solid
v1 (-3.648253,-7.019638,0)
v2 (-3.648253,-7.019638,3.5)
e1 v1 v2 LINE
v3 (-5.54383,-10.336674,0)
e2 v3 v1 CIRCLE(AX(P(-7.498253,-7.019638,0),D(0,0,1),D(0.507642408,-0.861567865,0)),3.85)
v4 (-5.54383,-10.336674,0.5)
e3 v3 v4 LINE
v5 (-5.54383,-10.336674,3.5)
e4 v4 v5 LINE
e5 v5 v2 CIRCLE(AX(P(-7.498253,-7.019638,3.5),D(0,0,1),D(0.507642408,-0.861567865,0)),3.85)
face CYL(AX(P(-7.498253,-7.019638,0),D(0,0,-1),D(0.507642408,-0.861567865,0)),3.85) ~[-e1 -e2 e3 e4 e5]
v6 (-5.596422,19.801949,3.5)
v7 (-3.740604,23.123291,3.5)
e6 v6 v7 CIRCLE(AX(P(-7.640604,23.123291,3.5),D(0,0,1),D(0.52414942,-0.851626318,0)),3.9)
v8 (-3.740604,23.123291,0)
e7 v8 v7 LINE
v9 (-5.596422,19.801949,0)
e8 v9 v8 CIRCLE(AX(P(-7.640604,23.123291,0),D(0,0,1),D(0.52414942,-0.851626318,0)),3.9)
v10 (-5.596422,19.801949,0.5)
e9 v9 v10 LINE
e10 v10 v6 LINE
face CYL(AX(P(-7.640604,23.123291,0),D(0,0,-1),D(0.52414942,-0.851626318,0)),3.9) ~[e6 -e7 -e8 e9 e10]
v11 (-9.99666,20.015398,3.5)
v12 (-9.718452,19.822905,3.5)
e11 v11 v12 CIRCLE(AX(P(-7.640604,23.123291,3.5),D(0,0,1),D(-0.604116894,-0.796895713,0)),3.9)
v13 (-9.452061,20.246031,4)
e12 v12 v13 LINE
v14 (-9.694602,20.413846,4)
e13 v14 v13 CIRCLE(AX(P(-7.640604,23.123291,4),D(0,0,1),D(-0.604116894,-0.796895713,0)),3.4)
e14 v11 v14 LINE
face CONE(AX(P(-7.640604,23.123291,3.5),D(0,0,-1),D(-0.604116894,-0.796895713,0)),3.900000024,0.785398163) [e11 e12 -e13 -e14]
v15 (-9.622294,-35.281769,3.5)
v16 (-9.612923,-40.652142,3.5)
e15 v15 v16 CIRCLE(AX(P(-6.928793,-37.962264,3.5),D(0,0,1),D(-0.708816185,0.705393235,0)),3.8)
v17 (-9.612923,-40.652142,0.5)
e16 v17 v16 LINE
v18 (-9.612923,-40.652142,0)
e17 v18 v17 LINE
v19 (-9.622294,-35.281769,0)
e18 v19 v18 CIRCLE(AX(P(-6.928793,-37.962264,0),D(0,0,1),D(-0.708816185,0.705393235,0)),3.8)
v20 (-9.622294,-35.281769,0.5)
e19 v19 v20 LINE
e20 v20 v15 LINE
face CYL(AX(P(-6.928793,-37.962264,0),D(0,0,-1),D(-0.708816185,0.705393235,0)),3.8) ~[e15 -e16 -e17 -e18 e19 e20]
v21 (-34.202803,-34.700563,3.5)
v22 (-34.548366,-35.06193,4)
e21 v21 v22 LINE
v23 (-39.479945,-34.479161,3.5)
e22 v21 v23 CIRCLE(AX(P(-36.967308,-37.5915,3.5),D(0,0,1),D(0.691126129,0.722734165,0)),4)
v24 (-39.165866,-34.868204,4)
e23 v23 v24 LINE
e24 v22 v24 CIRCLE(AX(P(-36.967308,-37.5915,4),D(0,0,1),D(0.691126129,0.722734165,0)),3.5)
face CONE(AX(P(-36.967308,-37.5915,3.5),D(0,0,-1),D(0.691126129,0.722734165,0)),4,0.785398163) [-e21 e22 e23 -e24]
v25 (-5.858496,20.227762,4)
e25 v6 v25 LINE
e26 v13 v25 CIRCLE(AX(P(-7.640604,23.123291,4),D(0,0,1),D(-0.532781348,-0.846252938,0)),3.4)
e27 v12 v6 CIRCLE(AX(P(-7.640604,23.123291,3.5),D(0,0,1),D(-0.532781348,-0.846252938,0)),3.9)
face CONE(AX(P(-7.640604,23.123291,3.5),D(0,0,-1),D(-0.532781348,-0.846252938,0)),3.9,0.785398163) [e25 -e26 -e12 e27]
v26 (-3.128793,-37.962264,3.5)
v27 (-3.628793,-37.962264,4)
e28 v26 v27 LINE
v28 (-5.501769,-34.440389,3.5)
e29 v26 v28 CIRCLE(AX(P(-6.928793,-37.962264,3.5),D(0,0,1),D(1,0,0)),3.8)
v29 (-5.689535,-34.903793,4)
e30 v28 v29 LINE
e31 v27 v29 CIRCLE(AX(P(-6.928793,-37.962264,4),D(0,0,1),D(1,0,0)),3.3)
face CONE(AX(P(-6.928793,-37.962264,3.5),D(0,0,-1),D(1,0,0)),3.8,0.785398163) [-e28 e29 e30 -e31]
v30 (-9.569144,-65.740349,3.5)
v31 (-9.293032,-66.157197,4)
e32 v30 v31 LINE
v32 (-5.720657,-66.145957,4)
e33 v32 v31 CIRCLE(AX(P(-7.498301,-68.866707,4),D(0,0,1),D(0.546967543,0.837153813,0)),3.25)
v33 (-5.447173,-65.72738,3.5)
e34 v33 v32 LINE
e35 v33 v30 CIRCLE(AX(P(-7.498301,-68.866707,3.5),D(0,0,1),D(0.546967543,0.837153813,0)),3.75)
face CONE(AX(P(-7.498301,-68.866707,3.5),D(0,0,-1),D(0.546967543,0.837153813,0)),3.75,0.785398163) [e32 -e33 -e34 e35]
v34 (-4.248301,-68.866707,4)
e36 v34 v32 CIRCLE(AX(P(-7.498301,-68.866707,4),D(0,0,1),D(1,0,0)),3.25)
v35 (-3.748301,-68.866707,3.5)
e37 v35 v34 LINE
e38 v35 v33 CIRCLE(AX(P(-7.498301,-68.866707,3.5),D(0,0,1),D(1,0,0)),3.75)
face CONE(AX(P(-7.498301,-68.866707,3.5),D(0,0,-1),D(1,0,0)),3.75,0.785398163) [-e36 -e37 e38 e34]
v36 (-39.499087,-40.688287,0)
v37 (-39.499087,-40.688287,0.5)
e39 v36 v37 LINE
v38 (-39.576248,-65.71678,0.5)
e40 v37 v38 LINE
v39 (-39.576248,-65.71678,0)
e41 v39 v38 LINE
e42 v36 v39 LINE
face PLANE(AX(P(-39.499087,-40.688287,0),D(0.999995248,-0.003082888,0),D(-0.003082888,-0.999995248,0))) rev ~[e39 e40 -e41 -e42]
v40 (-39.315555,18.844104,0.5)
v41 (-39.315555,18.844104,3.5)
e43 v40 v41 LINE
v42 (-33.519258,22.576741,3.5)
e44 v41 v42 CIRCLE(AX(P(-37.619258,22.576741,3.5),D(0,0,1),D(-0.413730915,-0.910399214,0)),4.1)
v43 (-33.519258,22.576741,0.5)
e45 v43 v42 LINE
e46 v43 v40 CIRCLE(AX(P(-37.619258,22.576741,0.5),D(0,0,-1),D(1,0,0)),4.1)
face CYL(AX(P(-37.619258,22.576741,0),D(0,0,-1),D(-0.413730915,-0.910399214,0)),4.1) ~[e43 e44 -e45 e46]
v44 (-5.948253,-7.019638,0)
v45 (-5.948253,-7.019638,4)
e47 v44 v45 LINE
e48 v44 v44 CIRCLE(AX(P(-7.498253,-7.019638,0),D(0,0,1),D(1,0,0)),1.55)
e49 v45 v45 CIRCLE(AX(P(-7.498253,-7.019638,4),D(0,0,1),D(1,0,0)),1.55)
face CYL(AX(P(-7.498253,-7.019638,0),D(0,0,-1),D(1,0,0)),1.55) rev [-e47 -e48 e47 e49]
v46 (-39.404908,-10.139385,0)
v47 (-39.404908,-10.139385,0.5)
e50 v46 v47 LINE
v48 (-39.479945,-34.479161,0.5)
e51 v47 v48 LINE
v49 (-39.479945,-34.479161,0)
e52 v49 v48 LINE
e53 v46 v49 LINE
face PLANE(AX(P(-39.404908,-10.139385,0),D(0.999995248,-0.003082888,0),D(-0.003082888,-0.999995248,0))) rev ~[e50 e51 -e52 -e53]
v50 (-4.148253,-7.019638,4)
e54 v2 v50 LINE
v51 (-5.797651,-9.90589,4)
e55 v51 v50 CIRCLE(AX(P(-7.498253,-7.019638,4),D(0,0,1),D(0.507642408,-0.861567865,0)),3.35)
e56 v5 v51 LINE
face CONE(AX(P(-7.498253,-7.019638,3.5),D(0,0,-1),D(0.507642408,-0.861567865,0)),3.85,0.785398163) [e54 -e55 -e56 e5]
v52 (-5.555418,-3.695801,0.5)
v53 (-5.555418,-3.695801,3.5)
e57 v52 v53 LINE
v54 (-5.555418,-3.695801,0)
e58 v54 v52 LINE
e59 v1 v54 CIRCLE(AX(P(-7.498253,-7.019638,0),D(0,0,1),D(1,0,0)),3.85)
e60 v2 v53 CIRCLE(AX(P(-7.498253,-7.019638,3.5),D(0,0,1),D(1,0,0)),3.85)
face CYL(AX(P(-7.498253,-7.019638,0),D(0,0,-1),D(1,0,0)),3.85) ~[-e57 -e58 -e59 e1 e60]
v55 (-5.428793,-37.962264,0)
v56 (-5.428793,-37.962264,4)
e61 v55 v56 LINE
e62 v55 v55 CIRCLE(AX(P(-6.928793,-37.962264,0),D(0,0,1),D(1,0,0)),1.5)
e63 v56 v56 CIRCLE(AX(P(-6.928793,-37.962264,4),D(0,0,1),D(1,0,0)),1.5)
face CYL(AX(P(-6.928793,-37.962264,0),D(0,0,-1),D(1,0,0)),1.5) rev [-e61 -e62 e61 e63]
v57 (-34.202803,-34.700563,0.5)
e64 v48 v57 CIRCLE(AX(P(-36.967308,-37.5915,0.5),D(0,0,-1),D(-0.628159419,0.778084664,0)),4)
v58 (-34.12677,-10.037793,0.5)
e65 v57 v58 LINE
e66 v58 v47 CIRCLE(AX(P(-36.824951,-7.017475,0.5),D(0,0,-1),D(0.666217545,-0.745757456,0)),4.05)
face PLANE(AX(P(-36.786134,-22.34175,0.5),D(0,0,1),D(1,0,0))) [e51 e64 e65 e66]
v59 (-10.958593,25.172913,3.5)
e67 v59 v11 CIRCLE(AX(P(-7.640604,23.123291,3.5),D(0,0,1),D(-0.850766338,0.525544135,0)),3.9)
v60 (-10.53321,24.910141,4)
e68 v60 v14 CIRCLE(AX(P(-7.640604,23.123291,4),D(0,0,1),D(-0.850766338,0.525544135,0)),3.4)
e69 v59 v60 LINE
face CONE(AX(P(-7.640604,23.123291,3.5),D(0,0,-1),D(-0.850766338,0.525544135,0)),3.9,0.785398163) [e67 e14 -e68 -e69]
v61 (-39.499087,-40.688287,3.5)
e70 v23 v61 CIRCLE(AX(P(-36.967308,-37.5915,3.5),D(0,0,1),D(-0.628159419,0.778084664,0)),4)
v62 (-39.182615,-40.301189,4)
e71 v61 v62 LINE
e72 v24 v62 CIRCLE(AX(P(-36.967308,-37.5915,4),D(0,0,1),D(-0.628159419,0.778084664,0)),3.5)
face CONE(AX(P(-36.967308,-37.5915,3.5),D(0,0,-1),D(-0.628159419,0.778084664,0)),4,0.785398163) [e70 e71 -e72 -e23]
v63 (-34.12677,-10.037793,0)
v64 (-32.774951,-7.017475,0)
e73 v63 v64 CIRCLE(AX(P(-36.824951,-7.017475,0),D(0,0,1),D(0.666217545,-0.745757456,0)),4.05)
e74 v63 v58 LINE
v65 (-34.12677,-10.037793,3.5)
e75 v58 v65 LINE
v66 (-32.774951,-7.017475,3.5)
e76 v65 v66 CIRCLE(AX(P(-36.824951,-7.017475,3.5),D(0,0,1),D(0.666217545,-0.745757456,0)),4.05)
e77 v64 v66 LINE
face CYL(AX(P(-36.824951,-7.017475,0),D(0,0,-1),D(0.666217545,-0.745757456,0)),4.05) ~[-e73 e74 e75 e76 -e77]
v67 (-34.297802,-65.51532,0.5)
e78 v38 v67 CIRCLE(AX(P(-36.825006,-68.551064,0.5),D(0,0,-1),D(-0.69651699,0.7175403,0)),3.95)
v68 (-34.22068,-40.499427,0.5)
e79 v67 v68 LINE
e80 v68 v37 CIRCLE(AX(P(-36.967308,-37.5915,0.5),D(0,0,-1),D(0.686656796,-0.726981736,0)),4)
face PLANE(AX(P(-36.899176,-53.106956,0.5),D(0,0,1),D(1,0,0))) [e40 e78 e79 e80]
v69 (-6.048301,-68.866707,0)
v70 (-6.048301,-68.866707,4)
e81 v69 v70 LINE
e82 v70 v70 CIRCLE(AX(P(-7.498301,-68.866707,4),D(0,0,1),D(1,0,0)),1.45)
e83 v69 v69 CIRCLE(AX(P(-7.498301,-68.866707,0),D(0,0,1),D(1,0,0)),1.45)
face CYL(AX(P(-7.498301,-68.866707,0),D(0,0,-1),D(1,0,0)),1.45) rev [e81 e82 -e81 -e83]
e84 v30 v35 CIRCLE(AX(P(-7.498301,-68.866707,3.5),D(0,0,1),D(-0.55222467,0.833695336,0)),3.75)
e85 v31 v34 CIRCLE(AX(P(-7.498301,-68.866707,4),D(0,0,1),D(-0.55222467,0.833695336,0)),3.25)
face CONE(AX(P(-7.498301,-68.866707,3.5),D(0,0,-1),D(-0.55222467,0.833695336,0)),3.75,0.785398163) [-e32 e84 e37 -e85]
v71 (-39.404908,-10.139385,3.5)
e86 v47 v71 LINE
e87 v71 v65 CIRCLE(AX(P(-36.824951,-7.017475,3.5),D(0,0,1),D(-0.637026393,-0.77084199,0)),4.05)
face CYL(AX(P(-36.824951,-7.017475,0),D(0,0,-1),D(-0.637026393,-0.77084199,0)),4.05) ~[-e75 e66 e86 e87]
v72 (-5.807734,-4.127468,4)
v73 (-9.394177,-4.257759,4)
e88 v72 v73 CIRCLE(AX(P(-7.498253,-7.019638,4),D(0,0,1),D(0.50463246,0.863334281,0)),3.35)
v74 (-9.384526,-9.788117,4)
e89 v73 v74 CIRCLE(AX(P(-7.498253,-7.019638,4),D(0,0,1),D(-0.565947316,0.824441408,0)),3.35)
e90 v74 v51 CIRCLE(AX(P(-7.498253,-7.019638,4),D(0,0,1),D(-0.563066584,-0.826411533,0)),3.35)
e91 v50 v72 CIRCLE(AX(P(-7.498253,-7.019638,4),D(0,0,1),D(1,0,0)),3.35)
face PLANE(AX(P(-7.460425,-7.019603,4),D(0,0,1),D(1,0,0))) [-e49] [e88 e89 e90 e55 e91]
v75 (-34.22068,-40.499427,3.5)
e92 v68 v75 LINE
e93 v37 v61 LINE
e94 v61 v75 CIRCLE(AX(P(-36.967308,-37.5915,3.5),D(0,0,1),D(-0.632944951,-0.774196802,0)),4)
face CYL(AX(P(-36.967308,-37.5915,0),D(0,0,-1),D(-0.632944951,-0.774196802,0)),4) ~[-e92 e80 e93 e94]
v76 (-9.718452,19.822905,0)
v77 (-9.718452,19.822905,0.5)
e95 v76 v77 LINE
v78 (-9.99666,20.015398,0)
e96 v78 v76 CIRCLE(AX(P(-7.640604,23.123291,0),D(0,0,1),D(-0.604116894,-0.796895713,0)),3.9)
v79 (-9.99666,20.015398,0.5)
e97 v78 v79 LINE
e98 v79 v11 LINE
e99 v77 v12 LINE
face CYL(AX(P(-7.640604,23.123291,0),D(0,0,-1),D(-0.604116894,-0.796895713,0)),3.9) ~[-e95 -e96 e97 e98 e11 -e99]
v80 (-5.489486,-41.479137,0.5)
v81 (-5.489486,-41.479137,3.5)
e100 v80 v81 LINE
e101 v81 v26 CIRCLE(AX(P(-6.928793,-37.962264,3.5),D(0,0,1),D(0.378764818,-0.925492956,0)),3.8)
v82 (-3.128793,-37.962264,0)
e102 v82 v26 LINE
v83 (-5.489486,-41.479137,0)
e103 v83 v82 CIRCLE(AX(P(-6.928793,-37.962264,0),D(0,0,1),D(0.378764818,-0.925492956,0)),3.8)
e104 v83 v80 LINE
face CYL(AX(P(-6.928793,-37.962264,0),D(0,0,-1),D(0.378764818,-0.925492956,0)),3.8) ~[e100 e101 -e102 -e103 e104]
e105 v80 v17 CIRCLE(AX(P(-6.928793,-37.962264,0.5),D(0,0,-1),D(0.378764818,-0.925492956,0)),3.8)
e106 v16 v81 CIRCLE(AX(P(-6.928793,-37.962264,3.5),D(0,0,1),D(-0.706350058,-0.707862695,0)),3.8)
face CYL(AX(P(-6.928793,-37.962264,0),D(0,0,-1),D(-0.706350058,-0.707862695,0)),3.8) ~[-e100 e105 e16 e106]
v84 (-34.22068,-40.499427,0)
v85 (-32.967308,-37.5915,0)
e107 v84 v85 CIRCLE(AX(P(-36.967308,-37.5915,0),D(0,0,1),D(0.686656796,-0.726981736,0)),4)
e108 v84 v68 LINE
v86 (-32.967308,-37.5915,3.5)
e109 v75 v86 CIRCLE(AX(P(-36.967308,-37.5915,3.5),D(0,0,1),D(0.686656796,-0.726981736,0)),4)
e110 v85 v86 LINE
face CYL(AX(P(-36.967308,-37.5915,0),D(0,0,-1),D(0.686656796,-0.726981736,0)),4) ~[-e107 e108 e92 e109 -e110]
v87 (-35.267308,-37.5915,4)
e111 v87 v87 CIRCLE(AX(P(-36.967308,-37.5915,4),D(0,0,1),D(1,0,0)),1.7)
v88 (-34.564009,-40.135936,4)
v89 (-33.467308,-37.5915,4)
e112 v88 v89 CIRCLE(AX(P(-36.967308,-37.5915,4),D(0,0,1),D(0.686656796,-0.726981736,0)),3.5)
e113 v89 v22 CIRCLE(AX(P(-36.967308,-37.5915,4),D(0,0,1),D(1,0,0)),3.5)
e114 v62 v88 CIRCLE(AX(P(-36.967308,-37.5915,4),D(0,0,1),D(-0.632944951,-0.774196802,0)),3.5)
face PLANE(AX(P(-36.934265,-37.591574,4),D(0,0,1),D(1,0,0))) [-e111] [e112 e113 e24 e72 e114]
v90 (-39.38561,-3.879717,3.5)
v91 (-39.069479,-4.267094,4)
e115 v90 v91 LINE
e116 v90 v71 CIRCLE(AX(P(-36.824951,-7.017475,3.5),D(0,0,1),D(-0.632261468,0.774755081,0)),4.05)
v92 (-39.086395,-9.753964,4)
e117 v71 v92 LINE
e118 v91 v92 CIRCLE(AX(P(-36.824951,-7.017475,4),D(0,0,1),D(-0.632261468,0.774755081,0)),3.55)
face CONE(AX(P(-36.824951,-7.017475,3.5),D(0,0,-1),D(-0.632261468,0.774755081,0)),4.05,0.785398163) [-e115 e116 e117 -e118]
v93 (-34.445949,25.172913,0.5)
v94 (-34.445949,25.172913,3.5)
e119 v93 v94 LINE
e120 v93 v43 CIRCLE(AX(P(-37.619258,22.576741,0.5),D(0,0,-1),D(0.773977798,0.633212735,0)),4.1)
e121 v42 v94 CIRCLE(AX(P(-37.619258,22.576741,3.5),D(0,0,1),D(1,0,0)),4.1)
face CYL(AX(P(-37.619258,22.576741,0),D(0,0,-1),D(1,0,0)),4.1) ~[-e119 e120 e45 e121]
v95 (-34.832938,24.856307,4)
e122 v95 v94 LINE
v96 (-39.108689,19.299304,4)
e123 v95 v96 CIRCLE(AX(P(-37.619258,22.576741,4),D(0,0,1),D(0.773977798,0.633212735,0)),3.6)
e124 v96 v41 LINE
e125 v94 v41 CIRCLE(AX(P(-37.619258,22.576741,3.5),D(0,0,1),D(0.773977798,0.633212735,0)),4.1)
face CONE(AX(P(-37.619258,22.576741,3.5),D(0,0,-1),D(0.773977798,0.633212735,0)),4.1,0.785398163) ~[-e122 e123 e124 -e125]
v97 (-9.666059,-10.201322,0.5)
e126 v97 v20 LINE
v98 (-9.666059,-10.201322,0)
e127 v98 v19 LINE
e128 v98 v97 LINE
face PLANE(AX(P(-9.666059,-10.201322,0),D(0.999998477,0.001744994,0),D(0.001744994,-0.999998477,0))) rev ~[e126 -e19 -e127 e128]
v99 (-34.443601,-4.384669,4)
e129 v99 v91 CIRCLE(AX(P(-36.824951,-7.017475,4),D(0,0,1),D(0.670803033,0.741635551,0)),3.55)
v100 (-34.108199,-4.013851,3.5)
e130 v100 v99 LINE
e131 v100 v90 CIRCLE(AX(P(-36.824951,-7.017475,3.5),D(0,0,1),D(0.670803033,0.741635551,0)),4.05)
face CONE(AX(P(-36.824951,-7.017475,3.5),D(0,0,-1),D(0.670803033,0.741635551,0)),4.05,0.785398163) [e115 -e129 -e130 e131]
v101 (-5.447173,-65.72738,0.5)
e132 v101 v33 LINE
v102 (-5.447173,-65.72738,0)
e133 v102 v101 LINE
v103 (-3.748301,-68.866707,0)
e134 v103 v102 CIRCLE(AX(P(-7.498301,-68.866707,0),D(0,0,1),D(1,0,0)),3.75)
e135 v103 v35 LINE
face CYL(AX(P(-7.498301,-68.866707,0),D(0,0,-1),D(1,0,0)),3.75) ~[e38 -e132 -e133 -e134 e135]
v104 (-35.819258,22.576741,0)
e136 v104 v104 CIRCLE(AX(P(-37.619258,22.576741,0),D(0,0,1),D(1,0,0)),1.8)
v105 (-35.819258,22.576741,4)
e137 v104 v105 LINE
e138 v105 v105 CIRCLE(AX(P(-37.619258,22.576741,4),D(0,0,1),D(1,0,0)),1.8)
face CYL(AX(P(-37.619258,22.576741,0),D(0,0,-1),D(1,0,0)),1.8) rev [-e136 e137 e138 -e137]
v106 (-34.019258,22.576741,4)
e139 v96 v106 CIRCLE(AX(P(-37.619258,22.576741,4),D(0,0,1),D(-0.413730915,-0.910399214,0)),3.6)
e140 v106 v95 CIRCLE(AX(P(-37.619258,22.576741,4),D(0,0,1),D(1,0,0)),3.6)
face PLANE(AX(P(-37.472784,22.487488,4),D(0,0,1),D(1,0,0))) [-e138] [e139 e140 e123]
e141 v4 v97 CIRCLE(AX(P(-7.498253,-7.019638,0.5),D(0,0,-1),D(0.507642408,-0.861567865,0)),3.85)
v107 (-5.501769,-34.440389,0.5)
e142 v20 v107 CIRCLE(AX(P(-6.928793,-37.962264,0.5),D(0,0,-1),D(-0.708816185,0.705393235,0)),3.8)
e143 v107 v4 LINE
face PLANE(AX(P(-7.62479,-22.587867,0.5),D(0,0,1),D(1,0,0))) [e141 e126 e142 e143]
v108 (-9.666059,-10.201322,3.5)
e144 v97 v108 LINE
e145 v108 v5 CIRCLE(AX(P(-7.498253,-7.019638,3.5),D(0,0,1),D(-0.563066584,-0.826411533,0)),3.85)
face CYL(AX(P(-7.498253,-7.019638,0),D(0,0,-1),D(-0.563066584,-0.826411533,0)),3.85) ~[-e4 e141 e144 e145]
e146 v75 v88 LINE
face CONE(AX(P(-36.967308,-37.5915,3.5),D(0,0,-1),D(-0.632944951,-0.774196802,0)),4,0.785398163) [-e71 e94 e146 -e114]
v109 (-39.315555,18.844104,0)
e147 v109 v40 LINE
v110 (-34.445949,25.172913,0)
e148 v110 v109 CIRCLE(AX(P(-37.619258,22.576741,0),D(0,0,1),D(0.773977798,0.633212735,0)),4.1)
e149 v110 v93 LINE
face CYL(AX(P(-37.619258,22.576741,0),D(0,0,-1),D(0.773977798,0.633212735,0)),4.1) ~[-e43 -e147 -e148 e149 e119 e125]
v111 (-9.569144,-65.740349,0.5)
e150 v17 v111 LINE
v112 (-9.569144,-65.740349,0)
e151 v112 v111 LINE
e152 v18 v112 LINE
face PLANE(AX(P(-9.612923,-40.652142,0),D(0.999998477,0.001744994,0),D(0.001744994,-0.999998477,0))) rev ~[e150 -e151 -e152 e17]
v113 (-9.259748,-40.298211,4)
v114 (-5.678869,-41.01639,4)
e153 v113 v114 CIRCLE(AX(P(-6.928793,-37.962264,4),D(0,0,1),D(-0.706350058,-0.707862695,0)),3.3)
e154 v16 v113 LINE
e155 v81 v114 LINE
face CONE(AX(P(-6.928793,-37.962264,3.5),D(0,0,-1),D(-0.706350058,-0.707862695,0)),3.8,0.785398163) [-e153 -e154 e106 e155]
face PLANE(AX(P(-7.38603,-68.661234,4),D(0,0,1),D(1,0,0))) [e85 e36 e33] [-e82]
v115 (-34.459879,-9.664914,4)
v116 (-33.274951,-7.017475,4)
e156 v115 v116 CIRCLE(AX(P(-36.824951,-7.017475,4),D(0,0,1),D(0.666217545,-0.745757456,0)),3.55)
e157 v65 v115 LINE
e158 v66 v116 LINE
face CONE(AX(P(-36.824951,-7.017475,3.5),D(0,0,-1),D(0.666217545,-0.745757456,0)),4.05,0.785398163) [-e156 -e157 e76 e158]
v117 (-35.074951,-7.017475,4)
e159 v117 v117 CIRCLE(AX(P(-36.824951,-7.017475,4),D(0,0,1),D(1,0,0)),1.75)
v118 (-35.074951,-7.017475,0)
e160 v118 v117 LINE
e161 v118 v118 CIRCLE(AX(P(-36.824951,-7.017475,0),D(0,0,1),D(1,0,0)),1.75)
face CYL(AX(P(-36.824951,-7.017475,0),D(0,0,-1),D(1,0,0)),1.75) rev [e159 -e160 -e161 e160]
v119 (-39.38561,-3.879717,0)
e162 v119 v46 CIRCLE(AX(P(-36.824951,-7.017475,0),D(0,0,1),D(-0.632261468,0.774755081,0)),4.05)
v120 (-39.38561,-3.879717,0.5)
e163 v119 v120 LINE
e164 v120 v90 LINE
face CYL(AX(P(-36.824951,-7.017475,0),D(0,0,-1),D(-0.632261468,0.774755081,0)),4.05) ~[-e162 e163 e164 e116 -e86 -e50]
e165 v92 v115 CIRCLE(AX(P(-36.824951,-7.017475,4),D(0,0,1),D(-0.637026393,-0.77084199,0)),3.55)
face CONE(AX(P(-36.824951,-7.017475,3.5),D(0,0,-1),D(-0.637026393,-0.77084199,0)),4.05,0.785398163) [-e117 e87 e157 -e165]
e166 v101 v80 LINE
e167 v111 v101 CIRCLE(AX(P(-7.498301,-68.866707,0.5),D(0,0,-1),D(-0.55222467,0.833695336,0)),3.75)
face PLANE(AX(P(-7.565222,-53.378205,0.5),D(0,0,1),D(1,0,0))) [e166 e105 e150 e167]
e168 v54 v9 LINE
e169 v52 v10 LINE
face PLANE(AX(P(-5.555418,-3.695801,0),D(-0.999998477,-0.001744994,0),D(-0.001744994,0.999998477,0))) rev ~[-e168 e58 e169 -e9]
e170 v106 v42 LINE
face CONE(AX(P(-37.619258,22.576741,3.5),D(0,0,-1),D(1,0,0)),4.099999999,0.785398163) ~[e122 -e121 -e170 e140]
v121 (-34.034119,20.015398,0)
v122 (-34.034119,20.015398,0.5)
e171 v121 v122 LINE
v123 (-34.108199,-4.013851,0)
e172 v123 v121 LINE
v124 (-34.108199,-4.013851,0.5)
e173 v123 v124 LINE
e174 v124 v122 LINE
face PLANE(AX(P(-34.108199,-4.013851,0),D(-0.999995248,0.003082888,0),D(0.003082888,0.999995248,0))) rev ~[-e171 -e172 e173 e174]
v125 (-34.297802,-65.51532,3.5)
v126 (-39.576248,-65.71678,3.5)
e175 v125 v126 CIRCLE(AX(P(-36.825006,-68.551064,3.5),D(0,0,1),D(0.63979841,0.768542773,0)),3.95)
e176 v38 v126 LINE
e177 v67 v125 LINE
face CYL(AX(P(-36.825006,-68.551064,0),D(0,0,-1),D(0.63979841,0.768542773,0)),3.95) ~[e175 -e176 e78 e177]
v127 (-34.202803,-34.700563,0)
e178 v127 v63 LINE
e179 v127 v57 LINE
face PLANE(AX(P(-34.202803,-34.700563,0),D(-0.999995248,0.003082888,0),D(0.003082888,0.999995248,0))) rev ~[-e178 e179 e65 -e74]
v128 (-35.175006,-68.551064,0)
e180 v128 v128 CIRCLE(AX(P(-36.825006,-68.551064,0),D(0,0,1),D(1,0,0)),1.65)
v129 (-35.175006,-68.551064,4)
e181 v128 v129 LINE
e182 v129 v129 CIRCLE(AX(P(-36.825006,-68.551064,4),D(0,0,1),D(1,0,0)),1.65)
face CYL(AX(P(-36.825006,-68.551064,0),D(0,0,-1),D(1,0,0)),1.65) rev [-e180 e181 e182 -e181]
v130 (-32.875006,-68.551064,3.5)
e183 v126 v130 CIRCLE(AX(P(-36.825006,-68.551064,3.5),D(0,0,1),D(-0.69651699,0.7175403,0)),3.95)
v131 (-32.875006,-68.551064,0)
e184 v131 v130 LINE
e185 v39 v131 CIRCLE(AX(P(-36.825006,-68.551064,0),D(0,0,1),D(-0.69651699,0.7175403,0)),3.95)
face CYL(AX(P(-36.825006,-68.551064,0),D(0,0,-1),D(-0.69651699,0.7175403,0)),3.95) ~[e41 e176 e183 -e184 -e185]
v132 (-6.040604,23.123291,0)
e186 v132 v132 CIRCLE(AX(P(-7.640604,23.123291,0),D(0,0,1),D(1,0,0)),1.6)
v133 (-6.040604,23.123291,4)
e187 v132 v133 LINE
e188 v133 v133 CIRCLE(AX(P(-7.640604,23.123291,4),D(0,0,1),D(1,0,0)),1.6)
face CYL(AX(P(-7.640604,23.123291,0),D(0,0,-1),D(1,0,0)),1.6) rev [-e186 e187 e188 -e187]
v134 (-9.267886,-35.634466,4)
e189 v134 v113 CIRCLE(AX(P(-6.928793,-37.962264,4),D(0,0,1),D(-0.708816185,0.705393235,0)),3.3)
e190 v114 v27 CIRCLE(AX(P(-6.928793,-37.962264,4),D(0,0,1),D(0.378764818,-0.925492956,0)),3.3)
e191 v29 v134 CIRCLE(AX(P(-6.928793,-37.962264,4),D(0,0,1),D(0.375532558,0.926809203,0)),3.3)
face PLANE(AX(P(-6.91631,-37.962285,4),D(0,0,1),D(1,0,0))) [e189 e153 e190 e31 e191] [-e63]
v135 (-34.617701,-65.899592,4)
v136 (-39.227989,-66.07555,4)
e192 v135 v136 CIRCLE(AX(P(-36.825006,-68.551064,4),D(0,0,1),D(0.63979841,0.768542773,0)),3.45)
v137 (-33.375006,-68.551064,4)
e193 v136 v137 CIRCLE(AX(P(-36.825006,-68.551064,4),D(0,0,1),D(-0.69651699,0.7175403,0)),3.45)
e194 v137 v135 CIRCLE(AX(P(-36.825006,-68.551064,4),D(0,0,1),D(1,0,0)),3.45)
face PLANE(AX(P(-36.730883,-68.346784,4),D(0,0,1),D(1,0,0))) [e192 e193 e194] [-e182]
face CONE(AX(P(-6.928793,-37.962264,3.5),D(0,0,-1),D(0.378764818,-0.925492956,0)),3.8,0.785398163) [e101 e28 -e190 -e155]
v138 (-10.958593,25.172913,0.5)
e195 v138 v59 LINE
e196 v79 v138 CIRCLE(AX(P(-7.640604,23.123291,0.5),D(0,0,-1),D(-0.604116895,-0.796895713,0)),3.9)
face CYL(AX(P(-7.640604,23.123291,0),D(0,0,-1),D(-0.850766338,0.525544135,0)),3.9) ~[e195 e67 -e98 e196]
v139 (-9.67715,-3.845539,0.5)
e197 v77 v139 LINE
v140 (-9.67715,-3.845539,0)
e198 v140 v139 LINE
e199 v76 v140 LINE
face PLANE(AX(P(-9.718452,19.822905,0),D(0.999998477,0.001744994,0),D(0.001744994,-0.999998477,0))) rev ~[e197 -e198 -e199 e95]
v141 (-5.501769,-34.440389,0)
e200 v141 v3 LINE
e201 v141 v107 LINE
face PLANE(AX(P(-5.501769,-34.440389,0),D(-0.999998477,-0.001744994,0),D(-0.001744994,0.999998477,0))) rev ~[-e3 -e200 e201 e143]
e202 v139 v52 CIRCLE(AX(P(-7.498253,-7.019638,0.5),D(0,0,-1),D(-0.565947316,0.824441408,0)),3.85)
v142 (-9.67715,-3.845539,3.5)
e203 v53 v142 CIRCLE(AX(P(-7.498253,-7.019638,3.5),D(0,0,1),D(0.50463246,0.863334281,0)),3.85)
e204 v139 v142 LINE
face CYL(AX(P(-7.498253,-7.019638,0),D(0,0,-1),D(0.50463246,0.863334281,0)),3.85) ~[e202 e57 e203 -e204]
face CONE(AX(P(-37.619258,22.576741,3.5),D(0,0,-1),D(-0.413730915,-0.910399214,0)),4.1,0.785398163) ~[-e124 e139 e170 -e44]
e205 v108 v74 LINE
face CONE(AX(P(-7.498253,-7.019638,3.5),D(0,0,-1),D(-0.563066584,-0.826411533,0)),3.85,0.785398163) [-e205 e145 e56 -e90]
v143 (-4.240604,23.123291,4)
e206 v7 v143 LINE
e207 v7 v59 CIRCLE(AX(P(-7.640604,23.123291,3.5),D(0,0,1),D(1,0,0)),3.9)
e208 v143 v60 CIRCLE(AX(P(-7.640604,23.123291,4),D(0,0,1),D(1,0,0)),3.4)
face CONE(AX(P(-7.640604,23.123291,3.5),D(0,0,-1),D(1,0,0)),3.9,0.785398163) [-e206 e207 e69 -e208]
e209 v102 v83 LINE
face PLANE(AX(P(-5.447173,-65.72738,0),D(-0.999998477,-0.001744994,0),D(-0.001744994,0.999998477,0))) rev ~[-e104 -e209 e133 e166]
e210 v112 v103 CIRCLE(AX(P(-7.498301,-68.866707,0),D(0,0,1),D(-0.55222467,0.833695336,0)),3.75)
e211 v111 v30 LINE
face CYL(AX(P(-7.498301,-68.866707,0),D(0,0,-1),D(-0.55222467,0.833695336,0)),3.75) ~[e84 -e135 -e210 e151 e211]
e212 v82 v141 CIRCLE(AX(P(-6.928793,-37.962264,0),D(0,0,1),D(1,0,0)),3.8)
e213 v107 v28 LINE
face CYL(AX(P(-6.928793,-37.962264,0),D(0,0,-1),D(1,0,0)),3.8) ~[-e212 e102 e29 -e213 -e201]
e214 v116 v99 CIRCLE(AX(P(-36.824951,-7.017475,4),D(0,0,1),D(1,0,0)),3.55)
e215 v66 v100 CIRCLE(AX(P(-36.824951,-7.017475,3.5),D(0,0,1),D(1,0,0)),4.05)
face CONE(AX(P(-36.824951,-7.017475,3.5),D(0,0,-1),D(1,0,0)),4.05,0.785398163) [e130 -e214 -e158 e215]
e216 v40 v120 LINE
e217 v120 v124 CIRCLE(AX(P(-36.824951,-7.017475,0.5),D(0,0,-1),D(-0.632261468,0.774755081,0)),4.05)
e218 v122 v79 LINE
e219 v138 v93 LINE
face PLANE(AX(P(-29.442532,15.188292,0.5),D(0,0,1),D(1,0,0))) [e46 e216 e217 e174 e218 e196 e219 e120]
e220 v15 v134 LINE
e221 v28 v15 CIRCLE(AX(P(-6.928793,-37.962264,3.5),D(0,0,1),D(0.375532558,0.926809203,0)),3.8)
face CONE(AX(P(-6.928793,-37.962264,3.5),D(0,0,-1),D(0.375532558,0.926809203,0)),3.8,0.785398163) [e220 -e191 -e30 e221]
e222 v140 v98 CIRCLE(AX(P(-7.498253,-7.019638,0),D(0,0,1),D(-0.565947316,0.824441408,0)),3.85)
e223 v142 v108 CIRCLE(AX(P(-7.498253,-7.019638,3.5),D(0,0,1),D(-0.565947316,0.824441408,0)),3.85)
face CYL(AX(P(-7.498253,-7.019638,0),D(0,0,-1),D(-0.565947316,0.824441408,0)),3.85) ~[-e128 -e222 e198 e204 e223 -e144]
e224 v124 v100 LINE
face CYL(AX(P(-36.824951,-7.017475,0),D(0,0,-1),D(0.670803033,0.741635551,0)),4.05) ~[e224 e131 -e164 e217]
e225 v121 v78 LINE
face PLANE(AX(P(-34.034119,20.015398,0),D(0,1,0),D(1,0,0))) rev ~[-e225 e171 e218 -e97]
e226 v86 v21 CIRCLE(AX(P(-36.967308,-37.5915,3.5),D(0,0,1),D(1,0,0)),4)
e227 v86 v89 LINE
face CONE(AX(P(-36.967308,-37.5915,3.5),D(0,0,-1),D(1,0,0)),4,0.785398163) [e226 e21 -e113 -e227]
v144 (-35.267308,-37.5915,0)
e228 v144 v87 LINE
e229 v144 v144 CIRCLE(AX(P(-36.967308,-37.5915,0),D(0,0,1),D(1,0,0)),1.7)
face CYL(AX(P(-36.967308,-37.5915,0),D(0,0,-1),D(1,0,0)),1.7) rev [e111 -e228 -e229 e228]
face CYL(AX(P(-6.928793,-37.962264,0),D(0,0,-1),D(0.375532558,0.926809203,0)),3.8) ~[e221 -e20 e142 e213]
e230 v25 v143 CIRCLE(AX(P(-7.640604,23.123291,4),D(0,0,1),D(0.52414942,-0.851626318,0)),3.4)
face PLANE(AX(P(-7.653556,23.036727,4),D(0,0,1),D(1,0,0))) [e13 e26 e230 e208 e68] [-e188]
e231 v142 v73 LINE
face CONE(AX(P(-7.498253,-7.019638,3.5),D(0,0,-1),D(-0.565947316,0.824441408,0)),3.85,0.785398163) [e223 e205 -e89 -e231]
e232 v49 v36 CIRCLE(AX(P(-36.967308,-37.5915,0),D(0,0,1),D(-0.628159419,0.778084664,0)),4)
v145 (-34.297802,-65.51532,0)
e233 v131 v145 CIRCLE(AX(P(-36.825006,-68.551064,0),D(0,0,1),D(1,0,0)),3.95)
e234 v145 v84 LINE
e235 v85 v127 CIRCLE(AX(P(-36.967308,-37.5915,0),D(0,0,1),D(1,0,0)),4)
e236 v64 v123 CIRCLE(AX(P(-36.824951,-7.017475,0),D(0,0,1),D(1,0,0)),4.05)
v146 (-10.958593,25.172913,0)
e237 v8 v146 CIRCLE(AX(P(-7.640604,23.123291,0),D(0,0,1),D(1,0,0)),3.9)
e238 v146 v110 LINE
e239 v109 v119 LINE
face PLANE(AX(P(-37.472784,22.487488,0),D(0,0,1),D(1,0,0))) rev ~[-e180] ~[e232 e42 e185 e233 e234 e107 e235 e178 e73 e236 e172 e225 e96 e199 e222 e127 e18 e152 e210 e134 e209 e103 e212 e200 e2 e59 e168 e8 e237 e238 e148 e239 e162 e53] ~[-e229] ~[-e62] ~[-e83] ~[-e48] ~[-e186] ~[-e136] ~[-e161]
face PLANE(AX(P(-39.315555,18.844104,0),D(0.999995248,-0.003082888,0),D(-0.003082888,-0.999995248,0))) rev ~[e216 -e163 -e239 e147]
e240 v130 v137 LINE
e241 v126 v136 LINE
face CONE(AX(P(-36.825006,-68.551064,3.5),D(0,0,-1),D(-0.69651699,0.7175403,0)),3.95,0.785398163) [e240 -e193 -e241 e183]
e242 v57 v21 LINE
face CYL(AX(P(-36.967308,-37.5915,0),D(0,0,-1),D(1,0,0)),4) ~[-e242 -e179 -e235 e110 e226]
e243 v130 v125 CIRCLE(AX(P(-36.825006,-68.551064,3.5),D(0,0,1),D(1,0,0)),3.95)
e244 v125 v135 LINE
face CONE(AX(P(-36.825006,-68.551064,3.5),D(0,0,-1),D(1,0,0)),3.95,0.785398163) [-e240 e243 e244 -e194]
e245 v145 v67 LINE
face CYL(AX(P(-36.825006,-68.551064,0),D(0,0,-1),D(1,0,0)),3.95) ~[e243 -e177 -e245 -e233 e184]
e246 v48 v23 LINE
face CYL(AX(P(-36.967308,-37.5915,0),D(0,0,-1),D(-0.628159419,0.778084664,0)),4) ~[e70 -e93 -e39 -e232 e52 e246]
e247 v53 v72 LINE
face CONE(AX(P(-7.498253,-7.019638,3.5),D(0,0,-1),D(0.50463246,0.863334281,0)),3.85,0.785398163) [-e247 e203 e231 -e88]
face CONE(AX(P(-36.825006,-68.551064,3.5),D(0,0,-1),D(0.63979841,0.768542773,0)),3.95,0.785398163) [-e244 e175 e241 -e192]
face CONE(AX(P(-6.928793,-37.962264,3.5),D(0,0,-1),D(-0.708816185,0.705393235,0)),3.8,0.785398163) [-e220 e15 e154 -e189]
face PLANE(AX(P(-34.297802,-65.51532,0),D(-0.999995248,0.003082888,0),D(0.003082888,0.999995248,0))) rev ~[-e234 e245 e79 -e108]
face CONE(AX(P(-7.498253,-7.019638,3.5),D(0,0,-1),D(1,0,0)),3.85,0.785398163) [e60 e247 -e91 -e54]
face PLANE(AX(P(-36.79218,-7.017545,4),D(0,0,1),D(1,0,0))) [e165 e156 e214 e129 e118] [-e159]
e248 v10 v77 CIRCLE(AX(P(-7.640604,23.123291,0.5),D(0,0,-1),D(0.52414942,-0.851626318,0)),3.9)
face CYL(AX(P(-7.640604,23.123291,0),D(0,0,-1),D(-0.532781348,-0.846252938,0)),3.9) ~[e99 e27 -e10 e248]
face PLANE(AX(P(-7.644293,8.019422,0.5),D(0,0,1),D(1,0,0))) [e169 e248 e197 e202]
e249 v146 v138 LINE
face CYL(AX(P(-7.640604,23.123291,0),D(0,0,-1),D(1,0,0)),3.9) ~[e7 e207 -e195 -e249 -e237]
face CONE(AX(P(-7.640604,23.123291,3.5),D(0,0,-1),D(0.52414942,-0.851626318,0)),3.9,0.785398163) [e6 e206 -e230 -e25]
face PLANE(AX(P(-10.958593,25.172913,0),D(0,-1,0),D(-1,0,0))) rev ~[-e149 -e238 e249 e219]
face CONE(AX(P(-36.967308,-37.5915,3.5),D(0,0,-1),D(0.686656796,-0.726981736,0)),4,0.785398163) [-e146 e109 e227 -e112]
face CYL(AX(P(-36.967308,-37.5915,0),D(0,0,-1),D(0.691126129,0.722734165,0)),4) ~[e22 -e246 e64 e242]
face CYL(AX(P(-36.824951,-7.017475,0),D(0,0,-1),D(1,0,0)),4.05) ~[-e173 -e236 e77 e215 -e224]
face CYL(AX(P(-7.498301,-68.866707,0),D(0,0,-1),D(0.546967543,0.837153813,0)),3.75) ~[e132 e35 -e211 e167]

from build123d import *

# Parameters (mm, degrees)
F1_DEPTH = 0.5
F0_R     = 1.8
F0_R_2   = 1.75
F0_R_3   = 1.7
F0_R_4   = 1.65
F0_R_5   = 1.45
F0_R_6   = 1.5
F0_R_7   = 1.55
F0_R_8   = 1.6
F2_DEPTH = 4
F3_SIZE  = 0.5


# Not quite as in the source:
# - a feature names something its author has since deleted; it is built from what else it names


with BuildPart() as f1:
    # F0 (on Top) → F1 (new body)
    with BuildSketch(Plane.XY):
        with BuildLine():
            ThreePointArc((-34.4459491638, 25.172913447), (-33.7578745255, 23.955043307), (-33.5192581371, 22.5767412339))
            ThreePointArc((-33.5192581371, 22.5767412339), (-35.3994402039, 19.129654298), (-39.3155548901, 18.8441044547))
            Line((-39.3155548901, 18.8441044547), (-39.3856102198, -3.8797168626))
            ThreePointArc((-39.3856102198, -3.8797168626), (-36.7220470885, -2.9687824702), (-34.1081989909, -4.0138509584))
            Line((-34.1081989909, -4.0138509584), (-34.0341191547, 20.0153980404))
            Line((-34.0341191547, 20.0153980404), (-9.9966601452, 20.0153980404))
            ThreePointArc((-9.9966601452, 20.0153980404), (-11.4744909058, 22.4082296795), (-10.9585929746, 25.172913447))
            Line((-10.9585929746, 25.172913447), (-34.4459491638, 25.172913447))
        make_face()
    extrude(amount=F1_DEPTH)



with BuildPart() as f1b:
    # F0 (on Top) → F1, piece 2 (new body)
    with BuildSketch(Plane.XY):
        with BuildLine():
            ThreePointArc((-34.1267702169, -10.0377926374), (-36.747012257, -11.0667249351), (-39.4049081675, -10.1393850024))
            Line((-39.4049081675, -10.1393850024), (-39.4799453288, -34.4791611719))
            ThreePointArc((-39.4799453288, -34.4791611719), (-36.7996355415, -33.5950156167), (-34.2028031384, -34.7005631683))
            Line((-34.2028031384, -34.7005631683), (-34.1267702169, -10.0377926374))
        make_face()
    extrude(amount=F1_DEPTH)


with BuildPart() as f1c:
    # F0 (on Top) → F1, piece 3 (new body)
    with BuildSketch(Plane.XY):
        with BuildLine():
            Line((-5.5554180266, -3.69580099), (-5.5964215167, 19.8019486813))
            ThreePointArc((-5.5964215167, 19.8019486813), (-7.6604313925, 19.2233417208), (-9.7184515138, 19.8229048634))
            Line((-9.7184515138, 19.8229048634), (-9.6771501637, -3.8455385501))
            ThreePointArc((-9.6771501637, -3.8455385501), (-7.638026651, -3.1721760384), (-5.5554180266, -3.69580099))
        make_face()
    extrude(amount=F1_DEPTH)


with BuildPart() as f1d:
    # F0 (on Top) → F1, piece 4 (new body)
    with BuildSketch(Plane.XY):
        with BuildLine():
            ThreePointArc((-34.2206804706, -40.4994267733), (-36.8242800383, -41.5889418992), (-39.4990874596, -40.6882870387))
            Line((-39.4990874596, -40.6882870387), (-39.5762478682, -65.7167801383))
            ThreePointArc((-39.5762478682, -65.7167801383), (-36.9756537231, -64.6039381296), (-34.2978020361, -65.515320369))
            Line((-34.2978020361, -65.515320369), (-34.2206804706, -40.4994267733))
        make_face()
    extrude(amount=F1_DEPTH)


with BuildPart() as f1e:
    # F0 (on Top) → F1, piece 5 (new body)
    with BuildSketch(Plane.XY):
        with BuildLine():
            ThreePointArc((-5.5438297262, -10.3366742508), (-7.6245982257, -10.8675642808), (-9.6660593434, -10.2013223749))
            Line((-9.6660593434, -10.2013223749), (-9.6222940519, -35.2817694502))
            ThreePointArc((-9.6222940519, -35.2817694502), (-7.6890371511, -34.2390892716), (-5.5017688296, -34.440388773))
            Line((-5.5017688296, -34.440388773), (-5.5438297262, -10.3366742508))
        make_face()
    extrude(amount=F1_DEPTH)


with BuildPart() as f1f:
    # F0 (on Top) → F1, piece 6 (new body)
    with BuildSketch(Plane.XY):
        with BuildLine():
            ThreePointArc((-5.4894862388, -41.4791369772), (-7.6760387081, -41.6880687805), (-9.6129227708, -40.6521419841))
            Line((-9.6129227708, -40.6521419841), (-9.5691439378, -65.7403492338))
            ThreePointArc((-9.5691439378, -65.7403492338), (-7.5101002942, -65.1167253071), (-5.4471731405, -65.7273799451))
            Line((-5.4471731405, -65.7273799451), (-5.4894862388, -41.4791369772))
        make_face()
    extrude(amount=F1_DEPTH)


with BuildPart() as f1_1:
    add(f1.part)

    add(f1b.part)  # F2 merges F1b

    add(f1c.part)  # F2 merges F1c

    add(f1d.part)  # F2 merges F1d

    add(f1e.part)  # F2 merges F1e

    add(f1f.part)  # F2 merges F1f
    # F0 (on Top) → F2 (join)
    with BuildSketch(Plane.XY):
        with BuildLine():
            ThreePointArc((-39.3155548901, 18.8441044547), (-35.3994402039, 19.129654298), (-33.5192581371, 22.5767412339))
            ThreePointArc((-33.5192581371, 22.5767412339), (-33.7578745255, 23.955043307), (-34.4459491638, 25.172913447))
            ThreePointArc((-34.4459491638, 25.172913447), (-40.8686961023, 25.0769718053), (-39.3155548901, 18.8441044547))
        make_face()
        with Locations((-37.6192581371, 22.5767412339)):
            Circle(F0_R, mode=Mode.SUBTRACT)
        with BuildLine():
            ThreePointArc((-34.1081989909, -4.0138509584), (-36.7220470885, -2.9687824702), (-39.3856102198, -3.8797168626))
            ThreePointArc((-39.3856102198, -3.8797168626), (-40.8749320279, -7.0049892451), (-39.4049081675, -10.1393850024))
            ThreePointArc((-39.4049081675, -10.1393850024), (-36.747012257, -11.0667249351), (-34.1267702169, -10.0377926374))
            ThreePointArc((-34.1267702169, -10.0377926374), (-33.1283221824, -8.6719940136), (-32.774951274, -7.0174749417))
            ThreePointArc((-32.774951274, -7.0174749417), (-33.1232390521, -5.3743600258), (-34.1081989909, -4.0138509584))
        make_face()
        with Locations((-36.824951274, -7.0174749417)):
            Circle(F0_R_2, mode=Mode.SUBTRACT)
        with BuildLine():
            ThreePointArc((-34.2028031384, -34.7005631683), (-36.7996355415, -33.5950156167), (-39.4799453288, -34.4791611719))
            ThreePointArc((-39.4799453288, -34.4791611719), (-40.9672886463, -37.5791682773), (-39.4990874596, -40.6882870387))
            ThreePointArc((-39.4990874596, -40.6882870387), (-36.8242800383, -41.5889418992), (-34.2206804706, -40.4994267733))
            ThreePointArc((-34.2206804706, -40.4994267733), (-33.2939911195, -39.1747703785), (-32.9673076548, -37.5914998294))
            ThreePointArc((-32.9673076548, -37.5914998294), (-33.2891275297, -36.0195612278), (-34.2028031384, -34.7005631683))
        make_face()
        with Locations((-36.9673076548, -37.5914998294)):
            Circle(F0_R_3, mode=Mode.SUBTRACT)
        with BuildLine():
            ThreePointArc((-34.2978020361, -65.515320369), (-36.9756537231, -64.6039381296), (-39.5762478682, -65.7167801383))
            ThreePointArc((-39.5762478682, -65.7167801383), (-38.363689229, -72.18905184), (-32.8750057563, -68.5510643234))
            ThreePointArc((-32.8750057563, -68.5510643234), (-33.2483484695, -66.8747521053), (-34.2978020361, -65.515320369))
        make_face()
        with Locations((-36.8250057563, -68.5510643234)):
            Circle(F0_R_4, mode=Mode.SUBTRACT)
        with BuildLine():
            ThreePointArc((-5.4471731405, -65.7273799451), (-7.5101002942, -65.1167253071), (-9.5691439378, -65.7403492338))
            ThreePointArc((-9.5691439378, -65.7403492338), (-9.2726802717, -72.1703531716), (-3.7483014256, -68.8667067453))
            ThreePointArc((-3.7483014256, -68.8667067453), (-4.2002541951, -67.0819422046), (-5.4471731405, -65.7273799451))
        make_face()
        with Locations((-7.4983014256, -68.8667067453)):
            Circle(F0_R_5, mode=Mode.SUBTRACT)
        with BuildLine():
            ThreePointArc((-5.5017688296, -34.440388773), (-7.6890371511, -34.2390892716), (-9.6222940519, -35.2817694502))
            ThreePointArc((-9.6222940519, -35.2817694502), (-10.7287867634, -37.9688947195), (-9.6129227708, -40.6521419841))
            ThreePointArc((-9.6129227708, -40.6521419841), (-7.6760387081, -41.6880687805), (-5.4894862388, -41.4791369772))
            ThreePointArc((-5.4894862388, -41.4791369772), (-3.7736884319, -40.0801206812), (-3.1287925489, -37.962263743))
            ThreePointArc((-3.1287925489, -37.962263743), (-3.7773888828, -35.8389043921), (-5.5017688296, -34.440388773))
        make_face()
        with Locations((-6.9287925489, -37.962263743)):
            Circle(F0_R_6, mode=Mode.SUBTRACT)
        with BuildLine():
            ThreePointArc((-3.6482529968, -7.0196379713), (-4.1589106487, -5.1035762076), (-5.5554180266, -3.69580099))
            ThreePointArc((-5.5554180266, -3.69580099), (-7.638026651, -3.1721760384), (-9.6771501637, -3.8455385501))
            ThreePointArc((-9.6771501637, -3.8455385501), (-11.3482471352, -7.0263561975), (-9.6660593434, -10.2013223749))
            ThreePointArc((-9.6660593434, -10.2013223749), (-7.6245982257, -10.8675642808), (-5.5438297262, -10.3366742508))
            ThreePointArc((-5.5438297262, -10.3366742508), (-4.155572217, -8.9298696861), (-3.6482529968, -7.0196379713))
        make_face()
        with Locations((-7.4982529968, -7.0196379713)):
            Circle(F0_R_7, mode=Mode.SUBTRACT)
        with BuildLine():
            ThreePointArc((-3.7406042554, 23.1232913211), (-6.5752770767, 26.8749680133), (-10.9585929746, 25.172913447))
            ThreePointArc((-10.9585929746, 25.172913447), (-11.4744909058, 22.4082296795), (-9.9966601452, 20.0153980404))
            ThreePointArc((-9.9966601452, 20.0153980404), (-9.8596440675, 19.9161333406), (-9.7184515138, 19.8229048634))
            ThreePointArc((-9.7184515138, 19.8229048634), (-7.6604313925, 19.2233417208), (-5.5964215167, 19.8019486813))
            ThreePointArc((-5.5964215167, 19.8019486813), (-4.2360255237, 21.2209654658), (-3.7406042554, 23.1232913211))
        make_face()
        with Locations((-7.6406042554, 23.1232913211)):
            Circle(F0_R_8, mode=Mode.SUBTRACT)
    extrude(amount=F2_DEPTH)

    # F3
    f3_edges = [f1_1.edges().sort_by_distance(p)[0] for p in [
        (-41.719258, 22.576741, 4),
        (-34.244994, -3.895565, 4),
        (-34.45467, -40.703838, 4),
        (-34.073764, -71.385349, 4),
        (-11.540604, 23.123291, 4),
        (-9.441088, -10.343475, 4),
        (-8.355816, -41.484139, 4),
        (-9.54943, -72.006034, 4),
    ]]
    chamfer(f3_edges, length=F3_SIZE)


solid = f1_1.part
